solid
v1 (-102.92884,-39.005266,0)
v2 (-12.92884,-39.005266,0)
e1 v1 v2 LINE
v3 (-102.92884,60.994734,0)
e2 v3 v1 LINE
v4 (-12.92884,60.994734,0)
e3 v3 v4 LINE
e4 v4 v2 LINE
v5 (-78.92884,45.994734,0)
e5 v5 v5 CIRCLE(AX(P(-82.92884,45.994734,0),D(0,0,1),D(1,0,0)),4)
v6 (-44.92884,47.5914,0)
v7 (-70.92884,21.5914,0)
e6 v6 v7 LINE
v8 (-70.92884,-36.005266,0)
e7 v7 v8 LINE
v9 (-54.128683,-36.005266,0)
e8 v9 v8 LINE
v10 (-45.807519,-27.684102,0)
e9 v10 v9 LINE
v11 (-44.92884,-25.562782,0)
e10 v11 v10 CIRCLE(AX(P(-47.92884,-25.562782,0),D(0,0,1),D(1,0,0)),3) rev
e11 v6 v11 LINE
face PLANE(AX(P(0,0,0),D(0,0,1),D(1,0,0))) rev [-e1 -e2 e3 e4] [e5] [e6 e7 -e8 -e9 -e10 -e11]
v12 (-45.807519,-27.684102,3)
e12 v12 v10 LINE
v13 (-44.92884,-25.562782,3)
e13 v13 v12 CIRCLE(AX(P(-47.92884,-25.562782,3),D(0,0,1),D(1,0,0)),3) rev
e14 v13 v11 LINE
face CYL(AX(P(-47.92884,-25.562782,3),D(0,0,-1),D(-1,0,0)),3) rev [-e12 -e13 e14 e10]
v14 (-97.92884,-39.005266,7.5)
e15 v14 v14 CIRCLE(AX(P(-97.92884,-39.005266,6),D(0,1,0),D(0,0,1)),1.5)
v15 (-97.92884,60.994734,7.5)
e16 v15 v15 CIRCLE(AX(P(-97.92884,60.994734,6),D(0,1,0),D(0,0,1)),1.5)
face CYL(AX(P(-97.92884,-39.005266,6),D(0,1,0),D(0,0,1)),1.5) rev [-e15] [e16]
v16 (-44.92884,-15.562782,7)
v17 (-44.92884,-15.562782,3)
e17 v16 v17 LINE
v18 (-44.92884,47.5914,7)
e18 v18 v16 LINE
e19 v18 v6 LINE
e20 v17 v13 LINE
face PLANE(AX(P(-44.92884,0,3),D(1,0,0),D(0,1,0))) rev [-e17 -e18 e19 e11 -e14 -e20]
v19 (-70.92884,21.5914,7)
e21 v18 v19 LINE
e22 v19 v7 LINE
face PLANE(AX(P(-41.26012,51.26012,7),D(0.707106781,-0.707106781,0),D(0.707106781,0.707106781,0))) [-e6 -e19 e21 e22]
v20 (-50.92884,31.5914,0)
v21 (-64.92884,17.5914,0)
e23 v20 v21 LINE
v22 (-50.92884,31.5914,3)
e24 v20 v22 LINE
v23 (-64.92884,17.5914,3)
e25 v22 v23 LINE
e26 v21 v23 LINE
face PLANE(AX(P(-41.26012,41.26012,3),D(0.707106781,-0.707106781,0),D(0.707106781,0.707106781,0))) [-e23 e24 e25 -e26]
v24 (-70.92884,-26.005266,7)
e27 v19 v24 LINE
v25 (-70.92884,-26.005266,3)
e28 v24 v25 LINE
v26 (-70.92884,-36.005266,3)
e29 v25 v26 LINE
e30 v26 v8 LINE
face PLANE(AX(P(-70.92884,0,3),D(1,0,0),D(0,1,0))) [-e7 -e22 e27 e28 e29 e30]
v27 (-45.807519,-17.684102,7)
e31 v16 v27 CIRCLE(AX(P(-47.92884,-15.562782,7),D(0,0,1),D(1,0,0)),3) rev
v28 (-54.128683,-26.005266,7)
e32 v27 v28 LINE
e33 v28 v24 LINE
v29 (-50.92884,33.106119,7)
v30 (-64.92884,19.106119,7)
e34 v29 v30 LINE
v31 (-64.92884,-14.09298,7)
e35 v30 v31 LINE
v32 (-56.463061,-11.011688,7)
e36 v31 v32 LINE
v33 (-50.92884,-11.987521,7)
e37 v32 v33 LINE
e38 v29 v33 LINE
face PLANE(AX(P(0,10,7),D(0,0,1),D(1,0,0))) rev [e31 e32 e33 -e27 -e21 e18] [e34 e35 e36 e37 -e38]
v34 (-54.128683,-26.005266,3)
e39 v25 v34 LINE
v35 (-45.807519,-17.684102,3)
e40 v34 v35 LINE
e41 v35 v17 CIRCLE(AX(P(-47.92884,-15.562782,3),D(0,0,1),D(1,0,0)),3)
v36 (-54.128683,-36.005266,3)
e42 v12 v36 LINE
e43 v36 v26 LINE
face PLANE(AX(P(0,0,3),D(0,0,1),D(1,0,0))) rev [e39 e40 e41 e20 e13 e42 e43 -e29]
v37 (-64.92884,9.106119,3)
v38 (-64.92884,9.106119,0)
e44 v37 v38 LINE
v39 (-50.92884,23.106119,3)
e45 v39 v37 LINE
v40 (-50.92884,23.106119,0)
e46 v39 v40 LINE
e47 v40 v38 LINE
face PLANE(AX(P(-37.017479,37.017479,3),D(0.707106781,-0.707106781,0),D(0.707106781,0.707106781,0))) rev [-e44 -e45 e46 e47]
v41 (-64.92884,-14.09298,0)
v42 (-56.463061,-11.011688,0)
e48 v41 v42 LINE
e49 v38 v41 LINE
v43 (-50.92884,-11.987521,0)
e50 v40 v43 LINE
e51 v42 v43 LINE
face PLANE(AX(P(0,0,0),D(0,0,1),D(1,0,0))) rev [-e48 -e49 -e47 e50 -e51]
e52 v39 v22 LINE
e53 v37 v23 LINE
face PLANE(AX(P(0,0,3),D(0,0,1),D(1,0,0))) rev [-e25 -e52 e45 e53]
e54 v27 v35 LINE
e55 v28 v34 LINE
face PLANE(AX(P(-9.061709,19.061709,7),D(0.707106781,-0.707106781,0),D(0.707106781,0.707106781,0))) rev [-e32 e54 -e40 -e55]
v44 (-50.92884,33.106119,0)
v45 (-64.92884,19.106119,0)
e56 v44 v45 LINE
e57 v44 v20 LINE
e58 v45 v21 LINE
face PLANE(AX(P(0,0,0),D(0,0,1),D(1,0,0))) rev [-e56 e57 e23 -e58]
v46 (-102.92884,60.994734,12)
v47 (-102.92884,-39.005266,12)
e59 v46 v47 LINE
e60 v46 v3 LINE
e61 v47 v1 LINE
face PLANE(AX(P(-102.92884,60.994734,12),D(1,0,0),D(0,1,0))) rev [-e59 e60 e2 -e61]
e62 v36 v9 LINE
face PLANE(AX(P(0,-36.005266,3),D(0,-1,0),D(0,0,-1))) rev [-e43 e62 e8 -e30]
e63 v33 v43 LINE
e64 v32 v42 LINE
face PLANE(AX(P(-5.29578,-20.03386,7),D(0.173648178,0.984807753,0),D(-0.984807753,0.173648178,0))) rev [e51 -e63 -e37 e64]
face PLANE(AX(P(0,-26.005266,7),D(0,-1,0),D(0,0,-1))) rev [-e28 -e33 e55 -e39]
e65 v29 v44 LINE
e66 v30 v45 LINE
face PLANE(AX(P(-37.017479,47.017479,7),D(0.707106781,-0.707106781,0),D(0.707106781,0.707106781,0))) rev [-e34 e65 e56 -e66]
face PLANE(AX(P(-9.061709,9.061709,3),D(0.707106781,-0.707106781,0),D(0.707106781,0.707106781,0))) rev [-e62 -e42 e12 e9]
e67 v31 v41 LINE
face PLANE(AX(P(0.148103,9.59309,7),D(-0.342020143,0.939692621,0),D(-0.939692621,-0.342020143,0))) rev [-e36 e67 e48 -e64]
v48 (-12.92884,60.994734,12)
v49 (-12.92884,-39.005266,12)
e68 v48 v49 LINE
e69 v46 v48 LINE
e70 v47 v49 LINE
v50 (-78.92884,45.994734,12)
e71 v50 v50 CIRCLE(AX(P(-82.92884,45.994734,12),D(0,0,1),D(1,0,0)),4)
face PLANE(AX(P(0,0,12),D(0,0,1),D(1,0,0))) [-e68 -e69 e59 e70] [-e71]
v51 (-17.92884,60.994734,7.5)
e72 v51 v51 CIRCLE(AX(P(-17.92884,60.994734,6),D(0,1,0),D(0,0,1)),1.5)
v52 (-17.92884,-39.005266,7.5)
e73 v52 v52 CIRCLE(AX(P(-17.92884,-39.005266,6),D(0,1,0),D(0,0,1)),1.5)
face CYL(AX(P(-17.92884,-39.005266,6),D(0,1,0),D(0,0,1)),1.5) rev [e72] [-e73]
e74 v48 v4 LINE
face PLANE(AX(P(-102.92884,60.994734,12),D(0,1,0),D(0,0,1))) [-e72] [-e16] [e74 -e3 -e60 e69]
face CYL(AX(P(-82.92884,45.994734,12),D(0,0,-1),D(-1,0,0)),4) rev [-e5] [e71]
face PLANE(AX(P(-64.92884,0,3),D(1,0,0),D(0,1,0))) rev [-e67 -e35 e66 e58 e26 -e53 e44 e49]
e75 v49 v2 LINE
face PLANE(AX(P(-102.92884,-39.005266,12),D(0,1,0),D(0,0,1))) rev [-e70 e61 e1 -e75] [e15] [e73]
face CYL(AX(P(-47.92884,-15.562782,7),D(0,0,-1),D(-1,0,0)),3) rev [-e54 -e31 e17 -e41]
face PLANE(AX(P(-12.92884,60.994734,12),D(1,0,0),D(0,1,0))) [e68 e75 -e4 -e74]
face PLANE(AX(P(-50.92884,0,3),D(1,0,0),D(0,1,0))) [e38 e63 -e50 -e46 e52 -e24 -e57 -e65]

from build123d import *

# Parameters (mm, degrees)
SKETCH1_W           = 90
SKETCH1_H           = 100
BOSS_EXTRUDE1_DEPTH = 12
CUT_EXTRUDE4_DEPTH  = 3
LPATTERN1_DEPTH     = 7
SKETCH1_6_R         = 4
CUT_EXTRUDE6_DEPTH  = 121.244349775
SKETCH3_R           = 1.5
CUT_EXTRUDE5_DEPTH  = 145.008145785


# Read off the part's stored shape, not the designer's step: LPattern1
with BuildPart() as part:
    # Sketch1 → Boss-Extrude1 (new body)
    with BuildSketch(Plane.XY):
        with Locations((-57.928839751, 10.994734202)):
            Rectangle(SKETCH1_W, SKETCH1_H)
    extrude(amount=BOSS_EXTRUDE1_DEPTH)

    # Sketch1<5> → Cut-Extrude4 (cut)
    with BuildSketch(Plane.XY):
        with BuildLine():
            Line((-44.928839751, -25.562781554), (-44.928839751, 37.591400024))
            Line((-44.928839751, 37.591400024), (-70.928839751, 11.591400024))
            Line((-70.928839751, 11.591400024), (-70.928839751, -28.377423907))
            Line((-70.928839751, -28.377423907), (-70.928839751, -36.005265798))
            Line((-70.928839751, -36.005265798), (-54.128683309, -36.005265798))
            Line((-54.128683309, -36.005265798), (-45.807519408, -27.684101897))
            ThreePointArc((-45.807519408, -27.684101897), (-45.157201154, -26.710831851), (-44.928839751, -25.562781554))
        make_face()
        Polygon((-50.928839751, 23.10611865), (-50.928839751, -21.987520776), (-56.463060705, -21.011688304), (-64.928839751, -24.092979887), (-64.928839751, 9.10611865), align=None, mode=Mode.SUBTRACT)
    extrude(amount=CUT_EXTRUDE4_DEPTH, mode=Mode.SUBTRACT)

    # LPattern1 outline → LPattern1 (cut)
    with BuildSketch(Plane.XY):
        with BuildLine():
            ThreePointArc((-45.807519408, -17.684101897), (-45.157201154, -16.710831851), (-44.928839751, -15.562781554))
            Line((-44.928839751, -15.562781554), (-44.928839751, 47.591400024))
            Line((-44.928839751, 47.591400024), (-70.928839751, 21.591400024))
            Line((-70.928839751, 21.591400024), (-70.928839751, -26.005265798))
            Line((-70.928839751, -26.005265798), (-54.128683309, -26.005265798))
            Line((-54.128683309, -26.005265798), (-45.807519408, -17.684101897))
        make_face()
        Polygon((-64.928839751, 19.10611865), (-50.928839751, 33.10611865), (-50.928839751, -11.987520776), (-56.463060705, -11.011688304), (-64.928839751, -14.092979887), align=None, mode=Mode.SUBTRACT)
    extrude(amount=LPATTERN1_DEPTH, mode=Mode.SUBTRACT)

    # Sketch1<6> → Cut-Extrude6 (cut, through all)
    with BuildSketch(Plane.XY):
        with Locations((-82.928839751, 45.994734202)):
            Circle(SKETCH1_6_R)
    extrude(amount=CUT_EXTRUDE6_DEPTH, mode=Mode.SUBTRACT)

    # Sketch3 → Cut-Extrude5 (cut, through all)
    with BuildSketch(Plane(origin=(0, 60.994734202, 0), x_dir=(1, 0, 0), z_dir=(0, 1, 0))):
        with Locations(Location((-17.928839751, -6, 0), (0, 0, 270))):
            Circle(SKETCH3_R)
        with Locations(Location((-97.928839751, -6, 0), (0, 0, 270))):
            Circle(SKETCH3_R)
    extrude(amount=-CUT_EXTRUDE5_DEPTH, mode=Mode.SUBTRACT)


solid = part.part
